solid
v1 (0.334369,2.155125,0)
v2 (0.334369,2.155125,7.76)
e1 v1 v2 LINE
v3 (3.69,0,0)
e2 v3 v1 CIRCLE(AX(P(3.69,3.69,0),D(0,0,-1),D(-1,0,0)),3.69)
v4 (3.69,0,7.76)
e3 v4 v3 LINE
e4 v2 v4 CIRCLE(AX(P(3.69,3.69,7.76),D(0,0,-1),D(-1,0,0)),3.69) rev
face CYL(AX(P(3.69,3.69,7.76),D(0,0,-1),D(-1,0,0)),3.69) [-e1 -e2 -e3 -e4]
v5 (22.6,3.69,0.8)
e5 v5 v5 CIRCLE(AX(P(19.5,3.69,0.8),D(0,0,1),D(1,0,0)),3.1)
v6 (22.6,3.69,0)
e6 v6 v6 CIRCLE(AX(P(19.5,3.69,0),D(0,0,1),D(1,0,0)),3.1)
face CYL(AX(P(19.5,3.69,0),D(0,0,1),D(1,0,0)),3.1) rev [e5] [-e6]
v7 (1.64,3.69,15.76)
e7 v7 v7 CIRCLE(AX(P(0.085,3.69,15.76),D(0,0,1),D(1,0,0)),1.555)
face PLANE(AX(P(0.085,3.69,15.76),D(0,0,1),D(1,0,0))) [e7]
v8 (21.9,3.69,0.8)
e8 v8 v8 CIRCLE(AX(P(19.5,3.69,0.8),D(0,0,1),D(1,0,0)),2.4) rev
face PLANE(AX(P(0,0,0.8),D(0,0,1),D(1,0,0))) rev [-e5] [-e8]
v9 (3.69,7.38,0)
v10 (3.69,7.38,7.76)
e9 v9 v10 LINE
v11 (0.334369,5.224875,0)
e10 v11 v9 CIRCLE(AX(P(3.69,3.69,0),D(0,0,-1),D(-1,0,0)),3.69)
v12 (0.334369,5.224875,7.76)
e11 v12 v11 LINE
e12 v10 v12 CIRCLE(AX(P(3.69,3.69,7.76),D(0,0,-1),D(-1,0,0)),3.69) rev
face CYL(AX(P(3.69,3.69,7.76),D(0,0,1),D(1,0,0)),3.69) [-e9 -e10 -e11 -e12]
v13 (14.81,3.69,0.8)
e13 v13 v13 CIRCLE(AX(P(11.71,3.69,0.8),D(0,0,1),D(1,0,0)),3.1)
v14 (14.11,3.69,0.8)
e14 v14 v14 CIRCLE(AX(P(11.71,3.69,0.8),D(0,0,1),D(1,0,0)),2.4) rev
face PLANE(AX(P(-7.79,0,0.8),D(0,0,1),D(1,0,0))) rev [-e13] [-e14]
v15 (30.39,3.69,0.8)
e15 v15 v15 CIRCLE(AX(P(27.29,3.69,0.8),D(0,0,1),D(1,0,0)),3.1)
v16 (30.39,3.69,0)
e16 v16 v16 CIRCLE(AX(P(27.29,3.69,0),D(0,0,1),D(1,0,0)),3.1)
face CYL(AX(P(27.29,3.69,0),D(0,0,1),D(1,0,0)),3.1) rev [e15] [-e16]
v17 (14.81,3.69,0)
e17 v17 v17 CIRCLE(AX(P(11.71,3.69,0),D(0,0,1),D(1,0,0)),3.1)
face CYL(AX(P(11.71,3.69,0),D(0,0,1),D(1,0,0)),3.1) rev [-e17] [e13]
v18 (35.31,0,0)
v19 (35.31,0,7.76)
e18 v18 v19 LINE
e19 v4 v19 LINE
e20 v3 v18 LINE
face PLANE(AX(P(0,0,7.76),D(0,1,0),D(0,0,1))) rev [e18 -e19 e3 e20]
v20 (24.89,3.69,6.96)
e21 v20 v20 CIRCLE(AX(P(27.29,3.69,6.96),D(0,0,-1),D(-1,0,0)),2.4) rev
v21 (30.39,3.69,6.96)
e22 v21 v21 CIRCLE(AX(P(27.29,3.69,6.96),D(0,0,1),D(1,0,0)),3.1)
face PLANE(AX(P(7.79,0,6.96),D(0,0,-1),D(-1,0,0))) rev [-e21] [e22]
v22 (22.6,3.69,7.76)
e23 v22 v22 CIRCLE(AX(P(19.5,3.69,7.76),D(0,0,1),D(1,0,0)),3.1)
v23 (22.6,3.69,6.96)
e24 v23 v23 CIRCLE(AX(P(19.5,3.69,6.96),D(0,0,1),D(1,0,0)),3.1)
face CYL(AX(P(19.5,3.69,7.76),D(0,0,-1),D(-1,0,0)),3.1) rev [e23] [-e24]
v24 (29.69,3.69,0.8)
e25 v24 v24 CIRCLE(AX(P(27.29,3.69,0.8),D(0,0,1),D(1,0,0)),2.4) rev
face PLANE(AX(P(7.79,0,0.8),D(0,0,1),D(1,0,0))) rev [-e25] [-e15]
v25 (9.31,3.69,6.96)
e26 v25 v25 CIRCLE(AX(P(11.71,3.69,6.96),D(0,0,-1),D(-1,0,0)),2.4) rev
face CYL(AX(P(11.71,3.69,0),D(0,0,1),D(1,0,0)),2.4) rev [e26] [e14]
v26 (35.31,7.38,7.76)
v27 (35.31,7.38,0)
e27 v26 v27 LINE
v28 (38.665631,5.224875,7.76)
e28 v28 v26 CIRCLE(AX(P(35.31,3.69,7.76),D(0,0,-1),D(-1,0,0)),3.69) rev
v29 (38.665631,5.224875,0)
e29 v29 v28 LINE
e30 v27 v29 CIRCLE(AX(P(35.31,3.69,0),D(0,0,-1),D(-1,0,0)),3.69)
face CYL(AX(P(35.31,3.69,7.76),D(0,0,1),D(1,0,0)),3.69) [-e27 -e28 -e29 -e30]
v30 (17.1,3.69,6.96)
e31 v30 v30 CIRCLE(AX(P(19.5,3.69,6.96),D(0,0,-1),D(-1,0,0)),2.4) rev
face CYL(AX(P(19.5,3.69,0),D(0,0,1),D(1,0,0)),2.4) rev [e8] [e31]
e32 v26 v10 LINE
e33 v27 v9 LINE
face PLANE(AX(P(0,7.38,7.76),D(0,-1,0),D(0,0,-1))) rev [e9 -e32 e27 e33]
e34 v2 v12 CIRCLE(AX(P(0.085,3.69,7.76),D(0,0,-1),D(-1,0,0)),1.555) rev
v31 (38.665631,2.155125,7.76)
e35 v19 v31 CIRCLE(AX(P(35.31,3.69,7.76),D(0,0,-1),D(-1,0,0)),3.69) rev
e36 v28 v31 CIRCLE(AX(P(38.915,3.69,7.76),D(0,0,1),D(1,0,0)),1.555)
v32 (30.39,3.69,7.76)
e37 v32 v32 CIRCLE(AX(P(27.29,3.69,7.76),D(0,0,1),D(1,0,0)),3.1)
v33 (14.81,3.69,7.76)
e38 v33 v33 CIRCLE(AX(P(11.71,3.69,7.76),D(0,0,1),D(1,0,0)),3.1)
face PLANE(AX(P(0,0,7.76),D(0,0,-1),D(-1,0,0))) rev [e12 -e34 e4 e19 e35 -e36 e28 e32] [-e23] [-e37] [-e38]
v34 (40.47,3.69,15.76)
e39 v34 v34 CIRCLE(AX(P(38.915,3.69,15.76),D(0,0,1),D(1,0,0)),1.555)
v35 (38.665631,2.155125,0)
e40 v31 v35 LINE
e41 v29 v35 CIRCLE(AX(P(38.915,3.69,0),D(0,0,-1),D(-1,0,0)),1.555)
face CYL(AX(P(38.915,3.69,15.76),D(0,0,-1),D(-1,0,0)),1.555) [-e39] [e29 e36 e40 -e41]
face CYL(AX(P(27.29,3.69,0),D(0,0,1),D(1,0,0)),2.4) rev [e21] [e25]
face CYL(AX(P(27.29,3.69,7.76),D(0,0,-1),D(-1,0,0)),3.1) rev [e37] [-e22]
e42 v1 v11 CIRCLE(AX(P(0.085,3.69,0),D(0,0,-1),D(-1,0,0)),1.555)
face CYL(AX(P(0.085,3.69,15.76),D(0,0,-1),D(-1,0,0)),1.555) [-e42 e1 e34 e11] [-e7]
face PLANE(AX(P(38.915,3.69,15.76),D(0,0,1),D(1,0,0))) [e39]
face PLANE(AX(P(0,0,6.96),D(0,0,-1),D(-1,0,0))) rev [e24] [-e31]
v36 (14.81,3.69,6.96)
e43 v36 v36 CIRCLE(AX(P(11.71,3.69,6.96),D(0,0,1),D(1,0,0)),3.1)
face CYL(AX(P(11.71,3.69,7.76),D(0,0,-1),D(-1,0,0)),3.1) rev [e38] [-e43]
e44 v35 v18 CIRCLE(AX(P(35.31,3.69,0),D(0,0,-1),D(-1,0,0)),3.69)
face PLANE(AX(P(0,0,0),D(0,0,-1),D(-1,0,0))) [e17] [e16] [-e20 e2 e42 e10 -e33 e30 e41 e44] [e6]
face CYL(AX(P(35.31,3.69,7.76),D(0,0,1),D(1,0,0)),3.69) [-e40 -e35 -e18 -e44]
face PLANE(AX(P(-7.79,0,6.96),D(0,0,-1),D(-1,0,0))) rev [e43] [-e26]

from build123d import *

# Parameters (mm, degrees)
SKETCH1_W                = 39
SKETCH1_H                = 7.38
BOSS_EXTRUDE1_DEPTH      = 7.76
SKETCH2_R                = 2.4
CUT_EXTRUDE1_DEPTH       = 7.76
CUT_EXTRUDE2_OUTLINE_R   = 3.1
CUT_EXTRUDE2_OUTLINE_R_2 = 2.4
CUT_EXTRUDE2_DEPTH       = 0.8
CUT_EXTRUDE3_START       = 6.96
CUT_EXTRUDE3_OUTLINE_R   = 3.1
CUT_EXTRUDE3_OUTLINE_R_2 = 2.4
CUT_EXTRUDE3_DEPTH       = 0.8
LPATTERN3_COUNT          = 3
LPATTERN3_PITCH          = 7.79
LPATTERN6_COUNT          = 3
LPATTERN6_PITCH          = 7.79
FILLET1_R                = 3.69
FILLET2_R                = 3.69
FILLET3_R                = 3.69
FILLET4_R                = 3.69
SKETCH3_R                = 3.1
BOSS_EXTRUDE2_DEPTH      = 7.76
BOSS_EXTRUDE3_START      = -7.76
SKETCH4_R                = 3.1
BOSS_EXTRUDE3_DEPTH      = 7.76
SKETCH11_R               = 1.555
BOSS_EXTRUDE7_DEPTH      = 8
SKETCH12_R               = 1.555
BOSS_EXTRUDE8_DEPTH      = 8
SKETCH14_R               = 1.555
BOSS_EXTRUDE9_DEPTH      = 8


# Read off the part's stored shape, not the designer's step: Cut-Extrude2, Cut-Extrude3
with BuildPart() as part:
    # Sketch1 → Boss-Extrude1 (new body)
    with BuildSketch(Plane.XY):
        with Locations((19.5, 3.69)):
            Rectangle(SKETCH1_W, SKETCH1_H)
    extrude(amount=BOSS_EXTRUDE1_DEPTH)

    # Sketch2 → Cut-Extrude1 (cut)
    with BuildSketch(Plane.XY.offset(7.76)):
        with Locations((19.5, 3.69)):
            Circle(SKETCH2_R)
    cut_extrude1 = extrude(amount=-CUT_EXTRUDE1_DEPTH, mode=Mode.SUBTRACT)

    # Cut-Extrude2 outline → Cut-Extrude2 (cut)
    with BuildSketch(Plane.XY):
        with Locations((19.5, 3.69)):
            Circle(CUT_EXTRUDE2_OUTLINE_R)
        with Locations((19.5, 3.69)):
            Circle(CUT_EXTRUDE2_OUTLINE_R_2, mode=Mode.SUBTRACT)
    cut_extrude2 = extrude(amount=CUT_EXTRUDE2_DEPTH, mode=Mode.SUBTRACT)

    # Cut-Extrude3 outline → Cut-Extrude3 (cut)
    with BuildSketch(Plane.XY.offset(CUT_EXTRUDE3_START)):
        with Locations((19.5, 3.69)):
            Circle(CUT_EXTRUDE3_OUTLINE_R)
        with Locations((19.5, 3.69)):
            Circle(CUT_EXTRUDE3_OUTLINE_R_2, mode=Mode.SUBTRACT)
    cut_extrude3 = extrude(amount=CUT_EXTRUDE3_DEPTH, mode=Mode.SUBTRACT)

    # LPattern3: Cut-Extrude1, Cut-Extrude2, Cut-Extrude3 ×3
    with Locations(*[(-i * LPATTERN3_PITCH, 0, 0) for i in range(1, LPATTERN3_COUNT)]):
        add(cut_extrude1, mode=Mode.SUBTRACT)
        add(cut_extrude2, mode=Mode.SUBTRACT)
        add(cut_extrude3, mode=Mode.SUBTRACT)

    # LPattern6: Cut-Extrude1, Cut-Extrude2, Cut-Extrude3 ×3
    with Locations(*[(i * LPATTERN6_PITCH, 0, 0) for i in range(1, LPATTERN6_COUNT)]):
        add(cut_extrude1, mode=Mode.SUBTRACT)
        add(cut_extrude2, mode=Mode.SUBTRACT)
        add(cut_extrude3, mode=Mode.SUBTRACT)

    # Fillet1
    fillet1_edges = [part.edges().sort_by_distance(p)[0] for p in [
        (0, 7.38, 3.88),
    ]]
    fillet(fillet1_edges, radius=FILLET1_R)

    # Fillet2
    fillet2_edges = [part.edges().sort_by_distance(p)[0] for p in [
        (0, 0, 3.88),
    ]]
    fillet(fillet2_edges, radius=FILLET2_R - 0.0001)  # a hair under: the kernel refuses the full size

    # Fillet3
    fillet3_edges = [part.edges().sort_by_distance(p)[0] for p in [
        (39, 7.38, 3.88),
    ]]
    fillet(fillet3_edges, radius=FILLET3_R)

    # Fillet4
    fillet4_edges = [part.edges().sort_by_distance(p)[0] for p in [
        (39, 0, 3.88),
    ]]
    fillet(fillet4_edges, radius=FILLET4_R - 0.0001)  # a hair under: the kernel refuses the full size

    # Sketch3 → Boss-Extrude2 (add)
    with BuildSketch(Plane(origin=(0, 0, 0), x_dir=(-1, 0, 0), z_dir=(0, 0, -1))):
        with Locations((-35.08, 3.69)):
            Circle(SKETCH3_R)
    extrude(amount=-BOSS_EXTRUDE2_DEPTH)

    # Sketch4 → Boss-Extrude3 (add)
    with BuildSketch(Plane.XY.offset(7.76).offset(BOSS_EXTRUDE3_START)):
        with Locations((3.92, 3.69)):
            Circle(SKETCH4_R)
    extrude(amount=BOSS_EXTRUDE3_DEPTH)

    # Sketch11 → Boss-Extrude7 (add)
    with BuildSketch(Plane.XY.offset(7.76)):
        with Locations(Location((0.085, 3.69, 0), (0, 0, 279.228133411))):
            Circle(SKETCH11_R)
        with Locations(Location((38.915, 3.69, 0), (0, 0, 99.228133411))):
            Circle(SKETCH11_R)
    extrude(amount=BOSS_EXTRUDE7_DEPTH)

    # Sketch12 → Boss-Extrude8 (add)
    with BuildSketch(Plane(origin=(0, 0, 0), x_dir=(-1, 0, 0), z_dir=(0, 0, -1))):
        with Locations(Location((-38.915, 3.69, 0), (0, 0, 80.771866589))):
            Circle(SKETCH12_R)
    extrude(amount=-BOSS_EXTRUDE8_DEPTH)

    # Sketch14 → Boss-Extrude9 (add)
    with BuildSketch(Plane(origin=(0, 0, 0), x_dir=(-1, 0, 0), z_dir=(0, 0, -1))):
        with Locations(Location((-0.085, 3.69, 0), (0, 0, 99.228133411))):
            Circle(SKETCH14_R)
    extrude(amount=-BOSS_EXTRUDE9_DEPTH)


solid = part.part
